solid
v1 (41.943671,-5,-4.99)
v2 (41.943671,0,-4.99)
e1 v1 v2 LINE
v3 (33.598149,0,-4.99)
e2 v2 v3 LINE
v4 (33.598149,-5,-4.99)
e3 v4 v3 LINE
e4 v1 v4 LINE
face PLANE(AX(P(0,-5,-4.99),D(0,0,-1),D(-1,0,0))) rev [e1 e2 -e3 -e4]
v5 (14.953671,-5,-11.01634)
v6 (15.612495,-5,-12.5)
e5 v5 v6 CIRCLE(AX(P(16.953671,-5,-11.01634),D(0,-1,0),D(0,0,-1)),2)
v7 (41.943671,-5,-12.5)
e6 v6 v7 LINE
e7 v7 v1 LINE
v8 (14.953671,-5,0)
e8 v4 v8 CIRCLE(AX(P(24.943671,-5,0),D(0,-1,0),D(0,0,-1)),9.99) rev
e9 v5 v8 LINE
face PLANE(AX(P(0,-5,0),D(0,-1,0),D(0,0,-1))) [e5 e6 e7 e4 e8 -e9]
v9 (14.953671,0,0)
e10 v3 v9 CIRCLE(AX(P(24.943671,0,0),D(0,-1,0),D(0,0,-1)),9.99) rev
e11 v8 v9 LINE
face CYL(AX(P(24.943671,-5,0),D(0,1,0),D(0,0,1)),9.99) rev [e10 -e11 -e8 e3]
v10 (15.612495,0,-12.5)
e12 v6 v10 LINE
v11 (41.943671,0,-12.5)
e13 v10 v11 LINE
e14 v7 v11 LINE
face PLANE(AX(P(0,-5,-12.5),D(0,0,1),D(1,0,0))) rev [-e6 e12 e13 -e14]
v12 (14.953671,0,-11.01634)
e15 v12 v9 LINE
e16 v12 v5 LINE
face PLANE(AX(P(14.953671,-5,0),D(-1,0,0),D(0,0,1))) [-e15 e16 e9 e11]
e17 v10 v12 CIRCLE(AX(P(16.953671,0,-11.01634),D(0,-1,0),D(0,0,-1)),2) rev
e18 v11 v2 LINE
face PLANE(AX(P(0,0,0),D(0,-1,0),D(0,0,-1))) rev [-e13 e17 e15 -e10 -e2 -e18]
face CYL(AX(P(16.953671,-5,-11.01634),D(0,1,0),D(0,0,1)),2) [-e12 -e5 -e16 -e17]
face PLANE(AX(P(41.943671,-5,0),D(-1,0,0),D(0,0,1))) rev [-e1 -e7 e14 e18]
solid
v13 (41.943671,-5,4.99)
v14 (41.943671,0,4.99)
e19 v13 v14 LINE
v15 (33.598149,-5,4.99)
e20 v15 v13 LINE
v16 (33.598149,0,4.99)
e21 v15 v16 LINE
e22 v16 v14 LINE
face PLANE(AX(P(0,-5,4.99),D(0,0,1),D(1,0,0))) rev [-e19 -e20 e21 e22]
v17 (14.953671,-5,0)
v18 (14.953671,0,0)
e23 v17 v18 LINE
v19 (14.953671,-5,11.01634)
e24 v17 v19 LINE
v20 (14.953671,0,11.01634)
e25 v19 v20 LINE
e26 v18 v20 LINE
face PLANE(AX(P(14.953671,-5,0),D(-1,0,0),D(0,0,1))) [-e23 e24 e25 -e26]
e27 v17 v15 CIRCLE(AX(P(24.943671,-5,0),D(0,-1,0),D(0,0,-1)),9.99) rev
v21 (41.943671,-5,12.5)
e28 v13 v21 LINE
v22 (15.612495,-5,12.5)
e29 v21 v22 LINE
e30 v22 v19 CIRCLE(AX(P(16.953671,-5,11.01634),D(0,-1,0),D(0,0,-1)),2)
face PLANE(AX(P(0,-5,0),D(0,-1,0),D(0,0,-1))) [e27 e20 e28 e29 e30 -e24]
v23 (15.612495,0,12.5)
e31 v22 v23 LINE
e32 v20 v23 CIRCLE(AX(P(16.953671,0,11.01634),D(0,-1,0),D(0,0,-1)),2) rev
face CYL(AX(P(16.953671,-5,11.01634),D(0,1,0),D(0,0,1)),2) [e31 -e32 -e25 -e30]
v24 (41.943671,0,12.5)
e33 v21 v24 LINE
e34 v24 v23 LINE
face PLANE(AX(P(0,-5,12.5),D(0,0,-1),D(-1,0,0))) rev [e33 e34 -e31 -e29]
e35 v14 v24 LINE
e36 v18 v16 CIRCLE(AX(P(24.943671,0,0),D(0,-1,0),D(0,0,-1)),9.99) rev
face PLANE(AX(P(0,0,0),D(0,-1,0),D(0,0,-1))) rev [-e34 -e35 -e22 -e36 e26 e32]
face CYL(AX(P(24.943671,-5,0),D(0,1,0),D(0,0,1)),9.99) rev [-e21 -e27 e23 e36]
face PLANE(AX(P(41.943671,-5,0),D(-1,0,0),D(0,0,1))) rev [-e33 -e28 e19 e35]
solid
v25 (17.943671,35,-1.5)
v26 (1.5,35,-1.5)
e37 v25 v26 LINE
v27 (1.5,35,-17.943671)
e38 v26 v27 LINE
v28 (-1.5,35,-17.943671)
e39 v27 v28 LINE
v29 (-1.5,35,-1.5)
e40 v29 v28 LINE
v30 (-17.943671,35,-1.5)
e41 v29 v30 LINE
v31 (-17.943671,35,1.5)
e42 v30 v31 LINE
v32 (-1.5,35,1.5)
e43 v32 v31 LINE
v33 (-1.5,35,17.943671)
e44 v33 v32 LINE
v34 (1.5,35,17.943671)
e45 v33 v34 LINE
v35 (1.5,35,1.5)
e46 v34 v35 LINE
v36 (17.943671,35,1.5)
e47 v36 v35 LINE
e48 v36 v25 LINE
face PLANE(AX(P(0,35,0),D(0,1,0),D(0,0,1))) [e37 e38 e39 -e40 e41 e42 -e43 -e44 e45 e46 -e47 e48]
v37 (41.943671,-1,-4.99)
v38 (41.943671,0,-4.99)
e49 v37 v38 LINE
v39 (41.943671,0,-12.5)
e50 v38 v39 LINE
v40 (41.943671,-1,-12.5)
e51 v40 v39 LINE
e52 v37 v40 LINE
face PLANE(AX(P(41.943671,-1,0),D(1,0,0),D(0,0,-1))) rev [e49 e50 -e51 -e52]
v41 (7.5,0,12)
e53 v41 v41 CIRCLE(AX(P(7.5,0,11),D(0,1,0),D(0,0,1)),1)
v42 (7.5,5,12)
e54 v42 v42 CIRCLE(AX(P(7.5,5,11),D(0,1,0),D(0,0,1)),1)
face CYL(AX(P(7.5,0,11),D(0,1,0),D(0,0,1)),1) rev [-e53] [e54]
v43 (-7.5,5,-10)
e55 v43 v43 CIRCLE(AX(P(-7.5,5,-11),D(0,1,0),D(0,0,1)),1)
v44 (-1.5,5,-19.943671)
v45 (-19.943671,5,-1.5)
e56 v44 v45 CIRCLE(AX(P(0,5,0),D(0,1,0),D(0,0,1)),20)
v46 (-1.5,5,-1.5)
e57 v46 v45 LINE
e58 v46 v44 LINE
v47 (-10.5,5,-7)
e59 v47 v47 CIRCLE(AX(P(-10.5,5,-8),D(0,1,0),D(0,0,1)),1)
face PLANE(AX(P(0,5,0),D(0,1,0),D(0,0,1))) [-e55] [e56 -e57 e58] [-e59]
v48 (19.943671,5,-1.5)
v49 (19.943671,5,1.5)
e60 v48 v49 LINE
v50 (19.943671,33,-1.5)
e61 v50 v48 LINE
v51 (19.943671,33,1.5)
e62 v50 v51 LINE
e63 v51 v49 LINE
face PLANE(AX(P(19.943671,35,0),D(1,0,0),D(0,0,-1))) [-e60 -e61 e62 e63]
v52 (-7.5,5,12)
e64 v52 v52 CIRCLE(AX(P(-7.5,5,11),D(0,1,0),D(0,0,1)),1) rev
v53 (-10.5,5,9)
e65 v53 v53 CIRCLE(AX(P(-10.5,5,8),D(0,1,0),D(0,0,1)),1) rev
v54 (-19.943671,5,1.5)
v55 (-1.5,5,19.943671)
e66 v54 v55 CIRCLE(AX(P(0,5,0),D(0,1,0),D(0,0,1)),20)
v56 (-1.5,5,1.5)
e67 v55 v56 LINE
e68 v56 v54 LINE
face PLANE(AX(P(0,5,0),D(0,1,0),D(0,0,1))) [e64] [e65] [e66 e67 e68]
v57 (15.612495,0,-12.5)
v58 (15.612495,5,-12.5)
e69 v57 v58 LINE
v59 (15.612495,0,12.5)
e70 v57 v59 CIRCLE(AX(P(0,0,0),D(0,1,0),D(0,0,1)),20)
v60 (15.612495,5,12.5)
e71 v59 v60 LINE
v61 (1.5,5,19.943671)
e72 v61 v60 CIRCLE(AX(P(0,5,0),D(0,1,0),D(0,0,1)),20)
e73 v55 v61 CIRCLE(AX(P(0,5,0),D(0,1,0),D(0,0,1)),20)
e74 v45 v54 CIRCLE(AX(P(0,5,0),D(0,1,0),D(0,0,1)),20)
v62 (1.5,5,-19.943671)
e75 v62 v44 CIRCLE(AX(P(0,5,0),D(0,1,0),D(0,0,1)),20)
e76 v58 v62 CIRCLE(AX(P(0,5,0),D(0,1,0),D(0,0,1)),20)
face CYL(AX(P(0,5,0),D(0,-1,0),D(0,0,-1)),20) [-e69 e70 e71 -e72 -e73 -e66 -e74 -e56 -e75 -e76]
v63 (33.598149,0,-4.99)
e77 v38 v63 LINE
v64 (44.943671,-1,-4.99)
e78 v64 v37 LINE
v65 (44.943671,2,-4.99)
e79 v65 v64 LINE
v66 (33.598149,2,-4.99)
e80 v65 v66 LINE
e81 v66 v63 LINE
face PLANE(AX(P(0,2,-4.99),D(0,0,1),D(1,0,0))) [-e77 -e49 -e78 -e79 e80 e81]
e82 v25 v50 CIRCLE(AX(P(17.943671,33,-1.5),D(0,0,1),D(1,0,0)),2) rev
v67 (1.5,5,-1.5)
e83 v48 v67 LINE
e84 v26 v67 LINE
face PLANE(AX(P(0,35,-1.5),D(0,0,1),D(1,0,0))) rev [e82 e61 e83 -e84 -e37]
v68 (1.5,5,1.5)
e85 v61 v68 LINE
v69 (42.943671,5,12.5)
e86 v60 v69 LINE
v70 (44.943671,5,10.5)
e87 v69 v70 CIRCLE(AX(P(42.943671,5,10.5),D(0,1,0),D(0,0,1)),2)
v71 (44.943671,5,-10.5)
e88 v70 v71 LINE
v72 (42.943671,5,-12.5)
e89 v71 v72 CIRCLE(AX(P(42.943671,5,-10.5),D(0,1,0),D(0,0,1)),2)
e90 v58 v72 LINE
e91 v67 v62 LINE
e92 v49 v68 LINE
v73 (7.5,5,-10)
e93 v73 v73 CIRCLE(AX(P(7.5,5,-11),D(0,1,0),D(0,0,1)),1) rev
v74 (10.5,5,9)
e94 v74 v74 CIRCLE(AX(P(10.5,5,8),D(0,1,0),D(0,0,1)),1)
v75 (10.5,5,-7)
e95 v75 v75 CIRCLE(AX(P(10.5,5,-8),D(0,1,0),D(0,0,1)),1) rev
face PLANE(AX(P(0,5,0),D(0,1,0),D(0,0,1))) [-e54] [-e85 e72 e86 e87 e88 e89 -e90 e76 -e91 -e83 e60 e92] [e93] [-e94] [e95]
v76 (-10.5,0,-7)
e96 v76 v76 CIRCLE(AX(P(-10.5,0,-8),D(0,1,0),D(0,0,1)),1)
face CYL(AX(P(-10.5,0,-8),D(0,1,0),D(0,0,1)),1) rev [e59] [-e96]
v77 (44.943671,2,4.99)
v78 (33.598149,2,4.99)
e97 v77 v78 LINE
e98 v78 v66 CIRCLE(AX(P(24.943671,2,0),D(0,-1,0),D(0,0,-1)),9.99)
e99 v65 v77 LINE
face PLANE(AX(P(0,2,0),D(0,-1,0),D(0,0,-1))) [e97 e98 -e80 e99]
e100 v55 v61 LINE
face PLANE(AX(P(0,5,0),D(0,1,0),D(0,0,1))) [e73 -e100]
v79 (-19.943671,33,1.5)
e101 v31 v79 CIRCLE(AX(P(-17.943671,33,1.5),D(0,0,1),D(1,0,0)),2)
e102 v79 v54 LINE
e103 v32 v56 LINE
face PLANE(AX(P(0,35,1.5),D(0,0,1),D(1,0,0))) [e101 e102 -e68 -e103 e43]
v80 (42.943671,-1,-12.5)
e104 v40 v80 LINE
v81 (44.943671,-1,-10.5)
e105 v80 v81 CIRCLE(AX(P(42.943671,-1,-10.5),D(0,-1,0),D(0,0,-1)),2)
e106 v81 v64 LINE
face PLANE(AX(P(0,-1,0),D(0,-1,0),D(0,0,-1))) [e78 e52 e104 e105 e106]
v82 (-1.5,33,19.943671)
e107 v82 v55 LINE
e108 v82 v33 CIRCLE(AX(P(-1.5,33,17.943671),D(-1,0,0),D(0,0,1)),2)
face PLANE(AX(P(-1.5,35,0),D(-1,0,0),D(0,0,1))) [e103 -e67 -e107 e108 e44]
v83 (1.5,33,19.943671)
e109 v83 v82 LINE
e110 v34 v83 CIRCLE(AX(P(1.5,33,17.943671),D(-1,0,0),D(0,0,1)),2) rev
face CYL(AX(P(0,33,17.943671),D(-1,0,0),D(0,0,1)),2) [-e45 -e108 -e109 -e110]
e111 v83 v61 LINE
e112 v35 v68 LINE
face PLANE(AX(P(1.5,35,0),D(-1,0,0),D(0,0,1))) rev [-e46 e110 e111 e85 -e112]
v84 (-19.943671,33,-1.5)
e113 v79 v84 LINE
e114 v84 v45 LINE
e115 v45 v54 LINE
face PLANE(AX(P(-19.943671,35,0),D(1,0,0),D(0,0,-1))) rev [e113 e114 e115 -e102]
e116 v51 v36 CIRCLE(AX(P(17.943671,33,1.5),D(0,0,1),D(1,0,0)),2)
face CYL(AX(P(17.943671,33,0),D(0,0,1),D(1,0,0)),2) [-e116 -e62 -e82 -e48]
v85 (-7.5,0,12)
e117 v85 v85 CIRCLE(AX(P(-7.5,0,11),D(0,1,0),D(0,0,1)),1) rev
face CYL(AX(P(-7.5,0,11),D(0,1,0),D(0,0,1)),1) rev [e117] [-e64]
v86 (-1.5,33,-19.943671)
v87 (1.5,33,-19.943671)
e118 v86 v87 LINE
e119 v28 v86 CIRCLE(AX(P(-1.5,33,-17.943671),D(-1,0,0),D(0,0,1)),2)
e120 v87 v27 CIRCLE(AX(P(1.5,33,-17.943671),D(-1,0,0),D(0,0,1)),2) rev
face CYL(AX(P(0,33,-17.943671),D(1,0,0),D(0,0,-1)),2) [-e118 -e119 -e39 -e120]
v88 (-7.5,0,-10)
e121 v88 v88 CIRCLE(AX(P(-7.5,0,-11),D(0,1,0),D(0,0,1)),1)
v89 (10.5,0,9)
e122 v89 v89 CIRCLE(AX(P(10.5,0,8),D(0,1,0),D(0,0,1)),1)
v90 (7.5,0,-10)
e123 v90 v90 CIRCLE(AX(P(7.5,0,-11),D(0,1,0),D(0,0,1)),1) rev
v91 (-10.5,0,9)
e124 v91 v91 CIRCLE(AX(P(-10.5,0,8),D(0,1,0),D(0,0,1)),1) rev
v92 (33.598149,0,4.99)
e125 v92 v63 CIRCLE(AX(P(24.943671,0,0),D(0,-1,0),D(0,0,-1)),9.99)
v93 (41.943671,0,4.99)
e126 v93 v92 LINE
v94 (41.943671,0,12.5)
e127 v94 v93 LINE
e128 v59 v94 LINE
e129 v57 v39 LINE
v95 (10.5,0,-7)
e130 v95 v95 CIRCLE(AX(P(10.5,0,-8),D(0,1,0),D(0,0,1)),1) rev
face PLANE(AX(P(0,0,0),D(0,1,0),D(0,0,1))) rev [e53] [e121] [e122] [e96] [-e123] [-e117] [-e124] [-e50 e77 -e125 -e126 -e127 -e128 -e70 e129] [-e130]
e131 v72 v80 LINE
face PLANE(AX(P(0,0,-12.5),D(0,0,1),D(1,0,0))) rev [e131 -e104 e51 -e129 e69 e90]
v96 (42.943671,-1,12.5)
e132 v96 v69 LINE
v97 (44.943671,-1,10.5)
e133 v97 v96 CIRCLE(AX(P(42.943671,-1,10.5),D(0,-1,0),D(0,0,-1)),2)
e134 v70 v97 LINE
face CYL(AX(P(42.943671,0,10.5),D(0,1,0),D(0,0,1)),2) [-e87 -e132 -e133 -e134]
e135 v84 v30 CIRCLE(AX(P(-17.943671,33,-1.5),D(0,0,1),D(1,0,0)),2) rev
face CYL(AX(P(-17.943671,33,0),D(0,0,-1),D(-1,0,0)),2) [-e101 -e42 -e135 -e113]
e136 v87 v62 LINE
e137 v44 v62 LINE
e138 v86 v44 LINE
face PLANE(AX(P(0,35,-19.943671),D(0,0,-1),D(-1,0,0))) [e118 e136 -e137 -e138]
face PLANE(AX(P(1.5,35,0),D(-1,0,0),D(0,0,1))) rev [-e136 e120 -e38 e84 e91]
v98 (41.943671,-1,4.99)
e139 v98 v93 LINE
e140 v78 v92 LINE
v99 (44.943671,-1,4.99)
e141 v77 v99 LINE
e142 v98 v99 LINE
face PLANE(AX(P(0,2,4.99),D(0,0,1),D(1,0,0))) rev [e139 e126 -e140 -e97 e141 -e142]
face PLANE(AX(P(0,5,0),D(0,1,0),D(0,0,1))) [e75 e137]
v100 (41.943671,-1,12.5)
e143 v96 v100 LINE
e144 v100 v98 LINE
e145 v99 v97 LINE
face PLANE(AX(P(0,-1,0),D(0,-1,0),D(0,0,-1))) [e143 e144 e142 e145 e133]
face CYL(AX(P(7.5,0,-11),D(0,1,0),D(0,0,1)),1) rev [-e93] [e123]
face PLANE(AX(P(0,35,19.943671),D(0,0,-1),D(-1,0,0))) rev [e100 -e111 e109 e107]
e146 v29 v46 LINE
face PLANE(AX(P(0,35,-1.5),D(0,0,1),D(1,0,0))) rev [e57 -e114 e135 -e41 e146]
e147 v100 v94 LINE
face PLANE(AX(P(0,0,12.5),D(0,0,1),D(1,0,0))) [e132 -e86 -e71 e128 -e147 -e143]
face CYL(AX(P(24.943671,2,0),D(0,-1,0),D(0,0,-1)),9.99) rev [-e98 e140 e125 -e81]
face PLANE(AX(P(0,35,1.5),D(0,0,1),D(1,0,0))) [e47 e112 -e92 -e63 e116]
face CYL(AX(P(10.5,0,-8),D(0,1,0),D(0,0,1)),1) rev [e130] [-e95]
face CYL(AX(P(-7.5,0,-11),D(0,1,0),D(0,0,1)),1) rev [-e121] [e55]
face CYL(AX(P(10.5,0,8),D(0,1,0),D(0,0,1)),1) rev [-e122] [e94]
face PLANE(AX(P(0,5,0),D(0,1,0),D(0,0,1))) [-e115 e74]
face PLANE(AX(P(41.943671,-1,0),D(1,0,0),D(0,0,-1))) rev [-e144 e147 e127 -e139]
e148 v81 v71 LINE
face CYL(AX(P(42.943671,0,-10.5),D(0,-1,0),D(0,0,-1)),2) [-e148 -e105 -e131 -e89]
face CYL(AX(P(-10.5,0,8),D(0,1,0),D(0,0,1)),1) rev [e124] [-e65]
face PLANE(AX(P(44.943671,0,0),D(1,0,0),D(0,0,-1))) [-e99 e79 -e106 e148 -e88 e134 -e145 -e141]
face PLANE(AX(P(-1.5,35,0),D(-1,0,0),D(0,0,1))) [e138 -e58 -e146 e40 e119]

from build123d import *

# Parameters (mm, degrees)
SKETCH1_R             = 20
BOSS_EXTRUDE1_DEPTH   = 5
SKETCH2_W             = 18.443670675
SKETCH2_H             = 3
SKETCH2_W_2           = 3
SKETCH2_H_2           = 18.443670675
BOSS_EXTRUDE2_DEPTH   = 30
BOSS_EXTRUDE3_DEPTH   = 5
CUT_EXTRUDE1_DEPTH    = 2
SKETCH5_R             = 1
CUT_EXTRUDE3_DEPTH    = 58.618864391
FILLET1_R             = 2
SKETCH7_W             = 3
SKETCH7_H             = 7.51
BOSS_EXTRUDE4_DEPTH   = 1
BOSS_EXTRUDE6_DEPTH   = 5
BOSS_EXTRUDE6_2_DEPTH = 5
FILLET2_R             = 2
FILLET3_R             = 2
FILLET4_R             = 2


with BuildPart() as part:
    # Sketch1 → Boss-Extrude1 (new body)
    with BuildSketch(Plane(origin=(0, 0, 0), x_dir=(1, 0, 0), z_dir=(0, 1, 0))):
        with Locations(Location((0, 0, 0), (0, 0, 270))):
            Circle(SKETCH1_R)
    extrude(amount=BOSS_EXTRUDE1_DEPTH)

    # Sketch2 → Boss-Extrude2 (add)
    with BuildSketch(Plane(origin=(0, 5, 0), x_dir=(1, 0, 0), z_dir=(0, 1, 0))):
        with Locations((-10.721835337, 0)):
            Rectangle(SKETCH2_W, SKETCH2_H)
        Rectangle(SKETCH2_W_2, SKETCH2_H)
        with Locations((0, -10.721835337)):
            Rectangle(SKETCH2_W_2, SKETCH2_H_2)
        with Locations((0, 10.721835337)):
            Rectangle(SKETCH2_W_2, SKETCH2_H_2)
        with Locations((10.721835337, 0)):
            Rectangle(SKETCH2_W, SKETCH2_H)
    extrude(amount=BOSS_EXTRUDE2_DEPTH)

    # Sketch3 → Boss-Extrude3 (add)
    with BuildSketch(Plane(origin=(0, 5, 0), x_dir=(1, 0, 0), z_dir=(0, 1, 0))):
        Polygon((-5.056329325, 12.5), (-5.056329325, -12.5), (15.612494996, -12.5), (44.943670675, -12.5), (44.943670675, 12.5), align=None)
    extrude(amount=-BOSS_EXTRUDE3_DEPTH)

    # Sketch4 → Cut-Extrude1 (cut)
    with BuildSketch(Plane.XZ):
        with BuildLine():
            ThreePointArc((33.598149285, 4.99), (14.953670675, 0), (33.598149285, -4.99))
            Line((33.598149285, -4.99), (24.943670675, -4.99))
            Line((24.943670675, -4.99), (24.943670675, 4.99))
            Line((24.943670675, 4.99), (33.598149285, 4.99))
        make_face()
        with BuildLine():
            Line((24.943670675, -4.99), (33.598149285, -4.99))
            ThreePointArc((33.598149285, -4.99), (34.594016299, -2.58281423), (34.933670675, 0))
            ThreePointArc((34.933670675, 0), (34.594016299, 2.58281423), (33.598149285, 4.99))
            Line((33.598149285, 4.99), (24.943670675, 4.99))
            Line((24.943670675, 4.99), (24.943670675, -4.99))
        make_face()
        with BuildLine():
            Line((33.598149285, -4.99), (44.943670675, -4.99))
            Line((44.943670675, -4.99), (44.943670675, 4.99))
            Line((44.943670675, 4.99), (33.598149285, 4.99))
            ThreePointArc((33.598149285, 4.99), (34.594016299, 2.58281423), (34.933670675, 0))
            ThreePointArc((34.933670675, 0), (34.594016299, -2.58281423), (33.598149285, -4.99))
        make_face()
        with BuildLine():
            ThreePointArc((33.598149285, 4.99), (14.953670675, 0), (33.598149285, -4.99))
            Line((33.598149285, -4.99), (24.943670675, -4.99))
            Line((24.943670675, -4.99), (24.943670675, 4.99))
            Line((24.943670675, 4.99), (33.598149285, 4.99))
        make_face()
        with BuildLine():
            Line((24.943670675, -4.99), (33.598149285, -4.99))
            ThreePointArc((33.598149285, -4.99), (34.594016299, -2.58281423), (34.933670675, 0))
            ThreePointArc((34.933670675, 0), (34.594016299, 2.58281423), (33.598149285, 4.99))
            Line((33.598149285, 4.99), (24.943670675, 4.99))
            Line((24.943670675, 4.99), (24.943670675, -4.99))
        make_face()
    extrude(amount=-CUT_EXTRUDE1_DEPTH, mode=Mode.SUBTRACT)

    # Sketch5 → Cut-Extrude3 (cut, through all)
    with BuildSketch(Plane(origin=(0, 5, 0), x_dir=(1, 0, 0), z_dir=(0, 1, 0))):
        with Locations(Location((-10.5, 8, 0), (0, 0, 270))):
            Circle(SKETCH5_R)
        with Locations(Location((-7.5, 11, 0), (0, 0, 270))):
            Circle(SKETCH5_R)
        with Locations(Location((7.5, 11, 0), (0, 0, 270))):
            Circle(SKETCH5_R)
        with Locations(Location((10.5, 8, 0), (0, 0, 270))):
            Circle(SKETCH5_R)
        with Locations(Location((-10.5, -8, 0), (0, 0, 270))):
            Circle(SKETCH5_R)
        with Locations(Location((-7.5, -11, 0), (0, 0, 270))):
            Circle(SKETCH5_R)
        with Locations(Location((10.5, -8, 0), (0, 0, 270))):
            Circle(SKETCH5_R)
        with Locations(Location((7.5, -11, 0), (0, 0, 270))):
            Circle(SKETCH5_R)
    extrude(amount=-CUT_EXTRUDE3_DEPTH, mode=Mode.SUBTRACT)

    # Fillet1
    fillet1_edges = [part.edges().sort_by_distance(p)[0] for p in [
        (19.943670675, 35, 0),
        (0, 35, -19.943670675),
        (-19.943670675, 35, 0),
        (0, 35, 19.943670675),
    ]]
    fillet(fillet1_edges, radius=FILLET1_R)

    # Sketch7 → Boss-Extrude4 (add)
    with BuildSketch(Plane.XZ):
        with Locations((43.443670675, 8.745)):
            Rectangle(SKETCH7_W, SKETCH7_H)
        with Locations((43.443670675, -8.745)):
            Rectangle(SKETCH7_W, SKETCH7_H)
    extrude(amount=BOSS_EXTRUDE4_DEPTH)

    # Fillet4
    fillet4_edges = [part.edges().sort_by_distance(p)[0] for p in [
        (44.943670675, 2, 12.5),
        (44.943670675, 2, -12.5),
    ]]
    fillet(fillet4_edges, radius=FILLET4_R)


with BuildPart() as body_2:
    # Sketch8 → Boss-Extrude6 (new body)
    with BuildSketch(Plane.XZ):
        with BuildLine():
            Line((14.953670675, 13.281104372), (14.953670675, 0))
            ThreePointArc((14.953670675, 0), (22.360856445, 9.650345624), (33.598149285, 4.99))
            Line((33.598149285, 4.99), (41.943670675, 4.99))
            Line((41.943670675, 4.99), (41.943670675, 12.5))
            Line((41.943670675, 12.5), (15.612494996, 12.5))
            ThreePointArc((15.612494996, 12.5), (15.288072212, 12.894760488), (14.953670675, 13.281104372))
        make_face()
    extrude(amount=BOSS_EXTRUDE6_DEPTH)

    # Fillet2
    # the kernel refuses this fillet: 2 mm, written as the material it takes off along each edge
    with BuildSketch(Plane(origin=(14.953670675, 5.661911606, 13.281104372), x_dir=(0, 0, -1), z_dir=(0, -1, 0))) as fillet2_piece_1:
        with BuildLine():
            CenterArc((2.264764642, 2), FILLET2_R, 222.112450768, 47.887549232)
            ThreePointArc((0.781104372, 0.658824321), (0.386343884, 0.334401537), (0, 0))
            Line((0, 0), (2.264764642, 0))
        make_face()
    extrude(amount=16.323823211, mode=Mode.SUBTRACT)


with BuildPart() as body_3:
    # Sketch8 → Boss-Extrude6 2 (new body)
    with BuildSketch(Plane.XZ):
        with BuildLine():
            Line((41.943670675, -4.99), (33.598149285, -4.99))
            ThreePointArc((33.598149285, -4.99), (22.360856445, -9.650345624), (14.953670675, 0))
            Line((14.953670675, 0), (14.953670675, -13.281104372))
            ThreePointArc((14.953670675, -13.281104372), (15.288072212, -12.894760488), (15.612494996, -12.5))
            Line((15.612494996, -12.5), (41.943670675, -12.5))
            Line((41.943670675, -12.5), (41.943670675, -4.99))
        make_face()
    extrude(amount=BOSS_EXTRUDE6_2_DEPTH)

    # Fillet3
    # the kernel refuses this fillet: 2 mm, written as the material it takes off along each edge
    with BuildSketch(Plane(origin=(14.953670675, 5.661911606, -13.281104372), x_dir=(0, 0, 1), z_dir=(0, -1, 0))) as fillet3_piece_1:
        with BuildLine():
            CenterArc((2.264764642, -2), FILLET3_R, 90, 47.887549232)
            ThreePointArc((0.781104372, -0.658824321), (0.386343884, -0.334401537), (0, 0))
            Line((0, 0), (2.264764642, 0))
        make_face()
    extrude(amount=16.323823211, mode=Mode.SUBTRACT)


solid = Compound([part.part, body_2.part, body_3.part])
